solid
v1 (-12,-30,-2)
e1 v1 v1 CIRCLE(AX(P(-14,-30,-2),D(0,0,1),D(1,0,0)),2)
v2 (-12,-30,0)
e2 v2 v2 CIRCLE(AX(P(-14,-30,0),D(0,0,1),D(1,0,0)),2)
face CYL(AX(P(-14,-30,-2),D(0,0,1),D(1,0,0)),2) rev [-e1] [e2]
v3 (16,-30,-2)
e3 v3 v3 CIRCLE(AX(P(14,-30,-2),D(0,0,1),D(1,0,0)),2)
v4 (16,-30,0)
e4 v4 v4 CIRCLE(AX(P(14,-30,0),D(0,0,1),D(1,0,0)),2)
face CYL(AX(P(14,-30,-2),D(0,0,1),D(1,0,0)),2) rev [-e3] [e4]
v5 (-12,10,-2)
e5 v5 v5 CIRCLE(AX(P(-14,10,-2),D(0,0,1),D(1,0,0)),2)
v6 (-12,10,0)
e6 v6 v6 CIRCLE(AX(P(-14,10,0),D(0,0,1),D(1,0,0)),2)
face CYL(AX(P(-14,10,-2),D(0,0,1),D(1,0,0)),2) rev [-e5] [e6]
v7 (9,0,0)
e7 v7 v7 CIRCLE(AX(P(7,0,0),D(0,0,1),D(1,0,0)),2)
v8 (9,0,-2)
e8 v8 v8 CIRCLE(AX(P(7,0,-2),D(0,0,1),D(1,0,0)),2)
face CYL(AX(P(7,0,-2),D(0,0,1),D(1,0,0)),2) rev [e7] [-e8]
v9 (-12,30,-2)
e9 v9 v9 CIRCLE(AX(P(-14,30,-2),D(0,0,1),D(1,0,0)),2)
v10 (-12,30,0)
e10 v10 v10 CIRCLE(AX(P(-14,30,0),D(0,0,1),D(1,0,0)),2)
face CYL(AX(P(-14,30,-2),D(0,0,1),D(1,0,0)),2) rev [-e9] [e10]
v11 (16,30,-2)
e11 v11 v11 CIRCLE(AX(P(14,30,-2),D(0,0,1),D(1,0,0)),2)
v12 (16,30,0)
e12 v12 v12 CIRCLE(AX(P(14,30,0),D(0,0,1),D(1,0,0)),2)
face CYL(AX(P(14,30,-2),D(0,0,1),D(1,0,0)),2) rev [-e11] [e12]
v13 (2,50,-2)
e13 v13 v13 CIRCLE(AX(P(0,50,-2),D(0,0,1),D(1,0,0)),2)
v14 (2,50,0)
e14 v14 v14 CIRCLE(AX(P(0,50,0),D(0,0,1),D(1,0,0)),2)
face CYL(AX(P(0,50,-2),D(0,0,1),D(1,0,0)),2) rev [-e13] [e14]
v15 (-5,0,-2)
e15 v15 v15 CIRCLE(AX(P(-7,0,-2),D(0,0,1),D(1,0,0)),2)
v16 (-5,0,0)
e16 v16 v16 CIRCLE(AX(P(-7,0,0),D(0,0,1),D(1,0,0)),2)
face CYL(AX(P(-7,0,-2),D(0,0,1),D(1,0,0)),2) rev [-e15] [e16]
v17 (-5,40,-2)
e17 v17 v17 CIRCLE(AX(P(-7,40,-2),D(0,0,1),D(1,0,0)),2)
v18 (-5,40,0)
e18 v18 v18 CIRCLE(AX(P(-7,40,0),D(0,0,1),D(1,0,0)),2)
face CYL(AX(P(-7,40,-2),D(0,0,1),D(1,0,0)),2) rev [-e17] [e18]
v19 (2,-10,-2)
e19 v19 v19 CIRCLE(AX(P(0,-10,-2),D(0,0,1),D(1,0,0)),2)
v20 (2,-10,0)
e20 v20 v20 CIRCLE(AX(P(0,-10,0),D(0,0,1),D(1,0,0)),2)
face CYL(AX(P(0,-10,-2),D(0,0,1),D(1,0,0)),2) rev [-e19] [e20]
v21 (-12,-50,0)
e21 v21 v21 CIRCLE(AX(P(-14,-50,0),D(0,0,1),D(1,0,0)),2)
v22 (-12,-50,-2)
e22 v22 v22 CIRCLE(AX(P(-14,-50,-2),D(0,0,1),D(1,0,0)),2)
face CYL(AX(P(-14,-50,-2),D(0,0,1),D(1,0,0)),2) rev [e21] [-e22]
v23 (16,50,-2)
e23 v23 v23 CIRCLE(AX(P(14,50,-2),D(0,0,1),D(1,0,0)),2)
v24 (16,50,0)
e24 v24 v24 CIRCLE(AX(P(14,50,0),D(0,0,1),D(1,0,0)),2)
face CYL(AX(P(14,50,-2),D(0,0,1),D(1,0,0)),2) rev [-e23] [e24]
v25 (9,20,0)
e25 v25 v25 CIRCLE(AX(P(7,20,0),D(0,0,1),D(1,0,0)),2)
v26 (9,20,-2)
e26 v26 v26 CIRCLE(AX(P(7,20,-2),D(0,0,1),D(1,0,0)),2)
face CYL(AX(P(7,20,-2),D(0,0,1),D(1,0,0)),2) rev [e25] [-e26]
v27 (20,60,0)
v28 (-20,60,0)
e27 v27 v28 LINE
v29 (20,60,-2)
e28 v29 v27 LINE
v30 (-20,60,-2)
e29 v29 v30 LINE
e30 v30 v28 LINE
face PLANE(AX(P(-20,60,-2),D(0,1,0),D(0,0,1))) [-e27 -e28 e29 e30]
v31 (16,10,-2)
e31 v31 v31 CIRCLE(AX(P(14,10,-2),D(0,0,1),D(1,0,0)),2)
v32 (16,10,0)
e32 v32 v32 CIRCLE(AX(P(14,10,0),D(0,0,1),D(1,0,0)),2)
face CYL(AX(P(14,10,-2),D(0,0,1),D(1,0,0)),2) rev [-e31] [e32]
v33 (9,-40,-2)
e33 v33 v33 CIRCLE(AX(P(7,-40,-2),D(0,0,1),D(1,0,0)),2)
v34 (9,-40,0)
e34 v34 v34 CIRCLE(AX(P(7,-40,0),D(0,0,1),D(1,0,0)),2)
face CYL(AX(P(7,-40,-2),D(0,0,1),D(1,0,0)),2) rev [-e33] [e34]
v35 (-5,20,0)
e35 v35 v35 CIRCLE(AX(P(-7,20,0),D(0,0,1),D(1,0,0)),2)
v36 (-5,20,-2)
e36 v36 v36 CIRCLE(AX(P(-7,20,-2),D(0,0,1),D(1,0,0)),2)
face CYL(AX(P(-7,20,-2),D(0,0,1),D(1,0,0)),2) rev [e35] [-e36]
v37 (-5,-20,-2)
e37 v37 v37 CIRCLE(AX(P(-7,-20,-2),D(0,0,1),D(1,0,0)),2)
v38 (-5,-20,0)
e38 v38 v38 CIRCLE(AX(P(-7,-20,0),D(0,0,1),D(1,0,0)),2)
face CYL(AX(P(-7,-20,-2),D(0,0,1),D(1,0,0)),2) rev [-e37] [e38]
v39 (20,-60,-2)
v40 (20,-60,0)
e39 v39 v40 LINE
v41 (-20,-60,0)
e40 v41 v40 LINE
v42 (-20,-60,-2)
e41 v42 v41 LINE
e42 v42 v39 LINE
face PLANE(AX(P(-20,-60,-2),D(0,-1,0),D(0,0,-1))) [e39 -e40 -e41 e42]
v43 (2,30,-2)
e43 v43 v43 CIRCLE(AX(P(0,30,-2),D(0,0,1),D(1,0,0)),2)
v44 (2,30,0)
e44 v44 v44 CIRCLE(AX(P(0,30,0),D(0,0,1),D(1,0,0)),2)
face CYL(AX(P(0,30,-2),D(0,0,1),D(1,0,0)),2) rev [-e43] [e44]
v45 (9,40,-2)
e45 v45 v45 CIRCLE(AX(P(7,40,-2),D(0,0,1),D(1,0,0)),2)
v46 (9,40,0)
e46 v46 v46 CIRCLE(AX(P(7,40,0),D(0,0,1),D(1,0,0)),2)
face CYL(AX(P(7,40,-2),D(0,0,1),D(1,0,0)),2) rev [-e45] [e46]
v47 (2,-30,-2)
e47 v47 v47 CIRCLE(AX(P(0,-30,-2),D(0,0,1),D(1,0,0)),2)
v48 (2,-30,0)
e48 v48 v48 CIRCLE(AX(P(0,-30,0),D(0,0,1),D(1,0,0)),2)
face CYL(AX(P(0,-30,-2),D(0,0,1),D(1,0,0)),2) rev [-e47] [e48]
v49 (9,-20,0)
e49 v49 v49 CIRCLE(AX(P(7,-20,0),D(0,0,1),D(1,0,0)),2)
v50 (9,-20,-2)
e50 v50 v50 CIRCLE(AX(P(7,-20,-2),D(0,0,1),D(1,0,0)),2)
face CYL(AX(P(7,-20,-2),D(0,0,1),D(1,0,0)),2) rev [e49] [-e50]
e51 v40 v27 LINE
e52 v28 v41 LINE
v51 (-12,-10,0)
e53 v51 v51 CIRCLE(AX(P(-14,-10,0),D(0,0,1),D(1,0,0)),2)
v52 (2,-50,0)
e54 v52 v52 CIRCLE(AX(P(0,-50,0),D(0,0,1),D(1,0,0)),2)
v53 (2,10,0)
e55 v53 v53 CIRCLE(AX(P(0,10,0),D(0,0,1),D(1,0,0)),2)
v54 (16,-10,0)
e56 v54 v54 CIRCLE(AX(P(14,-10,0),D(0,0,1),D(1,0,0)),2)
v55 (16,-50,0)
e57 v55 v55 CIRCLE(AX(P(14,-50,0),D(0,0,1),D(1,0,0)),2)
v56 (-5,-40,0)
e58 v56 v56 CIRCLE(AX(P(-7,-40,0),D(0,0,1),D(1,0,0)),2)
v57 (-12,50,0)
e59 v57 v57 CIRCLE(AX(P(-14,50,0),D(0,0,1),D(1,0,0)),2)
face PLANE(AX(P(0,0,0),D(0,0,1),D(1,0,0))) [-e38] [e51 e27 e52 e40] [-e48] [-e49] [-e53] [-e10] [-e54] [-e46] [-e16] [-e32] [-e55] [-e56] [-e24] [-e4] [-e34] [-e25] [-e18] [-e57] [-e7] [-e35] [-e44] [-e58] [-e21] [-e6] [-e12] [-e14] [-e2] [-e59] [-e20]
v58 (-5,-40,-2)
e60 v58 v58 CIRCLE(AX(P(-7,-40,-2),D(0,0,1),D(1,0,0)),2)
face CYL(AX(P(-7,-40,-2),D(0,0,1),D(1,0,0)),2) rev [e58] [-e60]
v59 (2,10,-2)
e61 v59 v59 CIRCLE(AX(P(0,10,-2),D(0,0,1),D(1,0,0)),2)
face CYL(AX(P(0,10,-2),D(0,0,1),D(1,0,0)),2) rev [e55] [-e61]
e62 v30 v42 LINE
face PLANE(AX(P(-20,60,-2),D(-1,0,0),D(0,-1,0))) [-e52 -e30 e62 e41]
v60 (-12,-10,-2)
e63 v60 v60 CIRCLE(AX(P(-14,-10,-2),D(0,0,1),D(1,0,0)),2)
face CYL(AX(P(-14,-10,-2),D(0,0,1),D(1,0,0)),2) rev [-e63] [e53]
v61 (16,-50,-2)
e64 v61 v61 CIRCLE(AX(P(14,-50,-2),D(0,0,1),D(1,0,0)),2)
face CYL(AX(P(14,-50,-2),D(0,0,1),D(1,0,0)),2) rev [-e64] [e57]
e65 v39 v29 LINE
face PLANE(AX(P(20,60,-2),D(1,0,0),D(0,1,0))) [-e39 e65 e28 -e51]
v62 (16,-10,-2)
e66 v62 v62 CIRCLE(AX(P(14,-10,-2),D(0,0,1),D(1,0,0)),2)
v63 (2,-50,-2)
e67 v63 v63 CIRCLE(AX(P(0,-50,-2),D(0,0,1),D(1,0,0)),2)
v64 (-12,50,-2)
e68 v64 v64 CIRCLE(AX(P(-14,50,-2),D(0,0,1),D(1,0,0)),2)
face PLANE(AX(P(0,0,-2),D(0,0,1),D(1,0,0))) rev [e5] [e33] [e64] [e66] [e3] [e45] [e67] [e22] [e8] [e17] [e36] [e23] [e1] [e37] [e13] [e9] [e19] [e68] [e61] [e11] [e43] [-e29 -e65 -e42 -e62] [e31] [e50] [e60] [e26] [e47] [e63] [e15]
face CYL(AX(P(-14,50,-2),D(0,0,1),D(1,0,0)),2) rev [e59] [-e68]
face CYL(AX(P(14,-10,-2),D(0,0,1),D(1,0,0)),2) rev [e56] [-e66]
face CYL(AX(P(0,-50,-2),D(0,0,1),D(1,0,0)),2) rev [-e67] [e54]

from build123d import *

# Parameters (mm, degrees)
SKETCH1_W          = 40
SKETCH1_H          = 120
SKETCH1_R          = 2
BASE_FLANGE1_DEPTH = 2


# Sheet-metal steps are written as plain solids
with BuildPart() as part:
    # Sketch1 → Base-Flange1 (new body)
    with BuildSketch(Plane.XY):
        Rectangle(SKETCH1_W, SKETCH1_H)
        with Locations((-14, 50)):
            Circle(SKETCH1_R, mode=Mode.SUBTRACT)
        with Locations((0, 50)):
            Circle(SKETCH1_R, mode=Mode.SUBTRACT)
        with Locations((14, 50)):
            Circle(SKETCH1_R, mode=Mode.SUBTRACT)
        with Locations((-7, 40)):
            Circle(SKETCH1_R, mode=Mode.SUBTRACT)
        with Locations((7, 40)):
            Circle(SKETCH1_R, mode=Mode.SUBTRACT)
        with Locations((-14, 30)):
            Circle(SKETCH1_R, mode=Mode.SUBTRACT)
        with Locations((-7, 20)):
            Circle(SKETCH1_R, mode=Mode.SUBTRACT)
        with Locations((7, 20)):
            Circle(SKETCH1_R, mode=Mode.SUBTRACT)
        with Locations((0, 30)):
            Circle(SKETCH1_R, mode=Mode.SUBTRACT)
        with Locations((14, 30)):
            Circle(SKETCH1_R, mode=Mode.SUBTRACT)
        with Locations((-14, 10)):
            Circle(SKETCH1_R, mode=Mode.SUBTRACT)
        with Locations((-7, 0)):
            Circle(SKETCH1_R, mode=Mode.SUBTRACT)
        with Locations((7, 0)):
            Circle(SKETCH1_R, mode=Mode.SUBTRACT)
        with Locations((0, 10)):
            Circle(SKETCH1_R, mode=Mode.SUBTRACT)
        with Locations((14, 10)):
            Circle(SKETCH1_R, mode=Mode.SUBTRACT)
        with Locations((-14, -10)):
            Circle(SKETCH1_R, mode=Mode.SUBTRACT)
        with Locations((-7, -20)):
            Circle(SKETCH1_R, mode=Mode.SUBTRACT)
        with Locations((7, -20)):
            Circle(SKETCH1_R, mode=Mode.SUBTRACT)
        with Locations((0, -10)):
            Circle(SKETCH1_R, mode=Mode.SUBTRACT)
        with Locations((14, -10)):
            Circle(SKETCH1_R, mode=Mode.SUBTRACT)
        with Locations((-14, -30)):
            Circle(SKETCH1_R, mode=Mode.SUBTRACT)
        with Locations((-7, -40)):
            Circle(SKETCH1_R, mode=Mode.SUBTRACT)
        with Locations((7, -40)):
            Circle(SKETCH1_R, mode=Mode.SUBTRACT)
        with Locations((0, -30)):
            Circle(SKETCH1_R, mode=Mode.SUBTRACT)
        with Locations((14, -30)):
            Circle(SKETCH1_R, mode=Mode.SUBTRACT)
        with Locations((-14, -50)):
            Circle(SKETCH1_R, mode=Mode.SUBTRACT)
        with Locations((0, -50)):
            Circle(SKETCH1_R, mode=Mode.SUBTRACT)
        with Locations((14, -50)):
            Circle(SKETCH1_R, mode=Mode.SUBTRACT)
    extrude(amount=-BASE_FLANGE1_DEPTH)


solid = part.part
